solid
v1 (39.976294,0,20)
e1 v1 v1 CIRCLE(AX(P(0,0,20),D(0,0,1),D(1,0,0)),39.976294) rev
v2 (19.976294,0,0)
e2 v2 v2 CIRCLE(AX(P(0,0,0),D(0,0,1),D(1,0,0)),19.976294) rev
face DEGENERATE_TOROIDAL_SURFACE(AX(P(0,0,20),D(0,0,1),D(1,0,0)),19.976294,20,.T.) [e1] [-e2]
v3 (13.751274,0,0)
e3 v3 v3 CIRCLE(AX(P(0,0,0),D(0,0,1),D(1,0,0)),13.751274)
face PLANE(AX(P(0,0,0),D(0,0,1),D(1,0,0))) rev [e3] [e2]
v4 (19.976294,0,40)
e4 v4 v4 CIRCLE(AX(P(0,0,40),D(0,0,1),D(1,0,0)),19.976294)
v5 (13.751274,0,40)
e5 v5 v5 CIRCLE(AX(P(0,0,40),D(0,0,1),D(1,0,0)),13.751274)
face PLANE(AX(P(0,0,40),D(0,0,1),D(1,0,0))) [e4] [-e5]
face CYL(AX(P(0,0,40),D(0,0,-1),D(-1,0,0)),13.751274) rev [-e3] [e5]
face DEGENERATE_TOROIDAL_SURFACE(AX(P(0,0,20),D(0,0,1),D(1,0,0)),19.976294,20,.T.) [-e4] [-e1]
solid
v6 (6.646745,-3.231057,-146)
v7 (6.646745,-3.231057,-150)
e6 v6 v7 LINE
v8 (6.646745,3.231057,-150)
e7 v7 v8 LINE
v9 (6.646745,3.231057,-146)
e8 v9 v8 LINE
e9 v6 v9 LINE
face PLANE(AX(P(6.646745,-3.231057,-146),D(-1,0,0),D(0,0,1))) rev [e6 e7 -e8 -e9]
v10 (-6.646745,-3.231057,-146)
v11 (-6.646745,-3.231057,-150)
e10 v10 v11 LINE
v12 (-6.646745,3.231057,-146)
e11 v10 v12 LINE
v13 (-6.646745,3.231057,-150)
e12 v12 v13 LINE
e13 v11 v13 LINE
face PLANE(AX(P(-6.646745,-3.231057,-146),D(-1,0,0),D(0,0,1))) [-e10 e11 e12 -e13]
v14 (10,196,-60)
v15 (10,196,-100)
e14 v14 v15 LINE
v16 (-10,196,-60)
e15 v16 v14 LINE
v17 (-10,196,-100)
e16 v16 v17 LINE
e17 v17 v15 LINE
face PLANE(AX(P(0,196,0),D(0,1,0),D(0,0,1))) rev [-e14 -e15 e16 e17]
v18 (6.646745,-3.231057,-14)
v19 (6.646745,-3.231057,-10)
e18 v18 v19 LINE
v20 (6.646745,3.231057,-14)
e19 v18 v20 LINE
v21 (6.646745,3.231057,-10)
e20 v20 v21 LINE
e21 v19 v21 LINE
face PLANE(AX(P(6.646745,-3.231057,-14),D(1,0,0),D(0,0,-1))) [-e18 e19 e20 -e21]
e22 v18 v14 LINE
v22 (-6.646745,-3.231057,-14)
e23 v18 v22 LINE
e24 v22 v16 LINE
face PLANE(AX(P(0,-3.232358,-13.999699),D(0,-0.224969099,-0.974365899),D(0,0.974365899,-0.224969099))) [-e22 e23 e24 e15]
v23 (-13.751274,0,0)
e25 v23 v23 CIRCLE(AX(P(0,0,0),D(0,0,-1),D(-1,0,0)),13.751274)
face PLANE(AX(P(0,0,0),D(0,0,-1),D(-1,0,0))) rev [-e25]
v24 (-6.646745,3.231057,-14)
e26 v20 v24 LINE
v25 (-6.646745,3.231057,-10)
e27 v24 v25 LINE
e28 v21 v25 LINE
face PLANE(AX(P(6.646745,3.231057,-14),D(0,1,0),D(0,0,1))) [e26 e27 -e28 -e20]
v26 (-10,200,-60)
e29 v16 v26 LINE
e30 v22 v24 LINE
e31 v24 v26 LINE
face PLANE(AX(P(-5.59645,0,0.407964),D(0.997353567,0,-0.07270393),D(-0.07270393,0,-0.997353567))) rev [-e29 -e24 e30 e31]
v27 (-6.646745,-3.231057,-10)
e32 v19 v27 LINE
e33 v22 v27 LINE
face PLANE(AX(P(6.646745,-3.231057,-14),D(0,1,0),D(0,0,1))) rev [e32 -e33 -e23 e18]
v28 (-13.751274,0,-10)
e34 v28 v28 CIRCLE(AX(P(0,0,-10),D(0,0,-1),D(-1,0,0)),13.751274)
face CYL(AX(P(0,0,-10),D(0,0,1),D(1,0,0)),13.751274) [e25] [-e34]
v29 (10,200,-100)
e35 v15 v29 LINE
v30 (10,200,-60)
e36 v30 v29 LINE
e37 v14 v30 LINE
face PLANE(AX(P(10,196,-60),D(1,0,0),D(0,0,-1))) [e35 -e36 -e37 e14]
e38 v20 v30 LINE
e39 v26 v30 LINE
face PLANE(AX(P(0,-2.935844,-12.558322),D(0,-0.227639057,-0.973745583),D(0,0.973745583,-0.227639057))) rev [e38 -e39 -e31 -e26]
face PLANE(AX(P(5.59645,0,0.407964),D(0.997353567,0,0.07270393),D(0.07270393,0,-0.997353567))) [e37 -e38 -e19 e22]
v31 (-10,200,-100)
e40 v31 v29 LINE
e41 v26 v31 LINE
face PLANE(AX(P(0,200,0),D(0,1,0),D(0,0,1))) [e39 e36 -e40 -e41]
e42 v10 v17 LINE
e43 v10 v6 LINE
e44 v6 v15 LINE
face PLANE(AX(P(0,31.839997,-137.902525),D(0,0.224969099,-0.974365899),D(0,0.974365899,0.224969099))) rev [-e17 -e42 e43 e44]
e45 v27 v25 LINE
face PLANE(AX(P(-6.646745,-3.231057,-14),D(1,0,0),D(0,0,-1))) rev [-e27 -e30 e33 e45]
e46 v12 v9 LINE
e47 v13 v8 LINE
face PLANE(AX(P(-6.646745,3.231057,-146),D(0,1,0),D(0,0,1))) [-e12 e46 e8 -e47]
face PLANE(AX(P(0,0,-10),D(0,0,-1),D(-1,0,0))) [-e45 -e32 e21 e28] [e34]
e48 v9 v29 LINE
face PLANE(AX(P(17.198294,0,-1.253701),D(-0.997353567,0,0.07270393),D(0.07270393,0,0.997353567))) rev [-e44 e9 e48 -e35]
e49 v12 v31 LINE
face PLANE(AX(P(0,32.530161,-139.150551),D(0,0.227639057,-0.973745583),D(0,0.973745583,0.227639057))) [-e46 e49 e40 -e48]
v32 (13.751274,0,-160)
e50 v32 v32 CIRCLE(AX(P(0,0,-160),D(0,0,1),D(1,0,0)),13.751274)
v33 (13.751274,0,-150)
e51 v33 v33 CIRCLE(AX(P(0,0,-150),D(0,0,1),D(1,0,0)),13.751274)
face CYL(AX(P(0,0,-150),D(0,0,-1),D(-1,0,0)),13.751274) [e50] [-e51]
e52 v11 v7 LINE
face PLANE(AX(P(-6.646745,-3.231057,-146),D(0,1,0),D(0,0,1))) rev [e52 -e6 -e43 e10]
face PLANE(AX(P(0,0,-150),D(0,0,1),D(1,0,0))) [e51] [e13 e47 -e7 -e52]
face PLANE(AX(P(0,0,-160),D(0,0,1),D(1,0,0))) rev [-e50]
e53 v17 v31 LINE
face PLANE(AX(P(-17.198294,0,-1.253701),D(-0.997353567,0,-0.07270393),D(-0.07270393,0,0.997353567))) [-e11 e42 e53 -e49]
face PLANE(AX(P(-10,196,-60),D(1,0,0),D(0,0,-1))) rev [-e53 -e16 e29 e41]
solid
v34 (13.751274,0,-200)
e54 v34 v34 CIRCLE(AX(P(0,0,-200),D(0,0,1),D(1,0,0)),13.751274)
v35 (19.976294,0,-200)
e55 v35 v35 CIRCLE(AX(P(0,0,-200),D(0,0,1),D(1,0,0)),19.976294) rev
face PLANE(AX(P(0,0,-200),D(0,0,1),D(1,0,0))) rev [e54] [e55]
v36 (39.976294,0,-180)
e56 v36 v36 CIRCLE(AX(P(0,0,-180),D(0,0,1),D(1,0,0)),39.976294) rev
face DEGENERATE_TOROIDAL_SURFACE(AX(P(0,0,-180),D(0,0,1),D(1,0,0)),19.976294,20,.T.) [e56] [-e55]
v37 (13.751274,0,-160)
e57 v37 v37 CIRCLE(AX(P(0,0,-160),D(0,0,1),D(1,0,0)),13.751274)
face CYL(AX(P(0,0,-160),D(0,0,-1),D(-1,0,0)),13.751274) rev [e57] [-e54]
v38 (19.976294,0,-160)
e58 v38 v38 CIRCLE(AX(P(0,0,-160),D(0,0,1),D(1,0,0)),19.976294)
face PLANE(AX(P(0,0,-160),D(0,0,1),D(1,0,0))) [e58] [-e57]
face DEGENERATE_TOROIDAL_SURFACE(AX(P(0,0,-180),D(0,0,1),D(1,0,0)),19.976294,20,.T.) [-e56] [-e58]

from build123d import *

# Parameters (mm, degrees)
SKETCH4_R            = 19.98814713
SKETCH4_R_2          = 6.875636986
BOSS_EXTRUDE4_DEPTH  = 20
SKETCH2_R            = 19.98814713
SKETCH2_R_2          = 6.875636986
BOSS_EXTRUDE6_DEPTH  = 20
FILLET2_R            = 10
FILLET3_R            = 10
SKETCH5_R            = 6.875636986
BOSS_EXTRUDE7_DEPTH  = 5
SKETCH6_R            = 6.875636986
BOSS_EXTRUDE8_DEPTH  = 5
SKETCH7_W            = 6.646745046
SKETCH7_H            = 3.23105662
BOSS_EXTRUDE9_DEPTH  = 2
SKETCH8_W            = 6.646745046
SKETCH8_H            = 3.23105662
BOSS_EXTRUDE10_DEPTH = 2
SKETCH9_W            = 10
SKETCH9_H            = 20
BOSS_EXTRUDE11_DEPTH = 2
SCALE3_SCALE         = 2


with BuildPart() as part:
    # Sketch4 → Boss-Extrude4 (new body)
    with BuildSketch(Plane.XY.offset(-100)):
        Circle(SKETCH4_R)
        Circle(SKETCH4_R_2, mode=Mode.SUBTRACT)
    extrude(amount=BOSS_EXTRUDE4_DEPTH)

    # Fillet3
    fillet3_edges = [part.edges().sort_by_distance(p)[0] for p in [
        (-19.98814713, 0, -100),
        (-19.98814713, 0, -80),
    ]]
    fillet(fillet3_edges, radius=FILLET3_R - 0.0001)  # a hair under: the kernel refuses the full size


with BuildPart() as body_2:
    # Sketch2 → Boss-Extrude6 (new body)
    with BuildSketch(Plane.XY):
        Circle(SKETCH2_R)
        Circle(SKETCH2_R_2, mode=Mode.SUBTRACT)
    extrude(amount=BOSS_EXTRUDE6_DEPTH)

    # Fillet2
    fillet2_edges = [body_2.edges().sort_by_distance(p)[0] for p in [
        (-19.98814713, 0, 0),
        (-19.98814713, 0, 20),
    ]]
    fillet(fillet2_edges, radius=FILLET2_R - 0.0001)  # a hair under: the kernel refuses the full size


with BuildPart() as body_3:
    # Sketch5 → Boss-Extrude7 (new body)
    with BuildSketch(Plane.XY.offset(-80)):
        Circle(SKETCH5_R)
    extrude(amount=BOSS_EXTRUDE7_DEPTH)

    # Sketch8 → Boss-Extrude10 (add)
    with BuildSketch(Plane.XY.offset(-75)):
        Rectangle(SKETCH8_W, SKETCH8_H)
    extrude(amount=BOSS_EXTRUDE10_DEPTH)



with BuildPart() as body_4:
    # Sketch6 → Boss-Extrude8 (new body)
    with BuildSketch(Plane(origin=(0, 0, 0), x_dir=(-1, 0, 0), z_dir=(0, 0, -1))):
        with Locations(Location((0, 0, 0), (0, 0, 180))):
            Circle(SKETCH6_R)
    extrude(amount=BOSS_EXTRUDE8_DEPTH)

    # Sketch7 → Boss-Extrude9 (add)
    with BuildSketch(Plane(origin=(0, 0, -5), x_dir=(-1, 0, 0), z_dir=(0, 0, -1))):
        Rectangle(SKETCH7_W, SKETCH7_H)
    extrude(amount=BOSS_EXTRUDE9_DEPTH)



with BuildPart() as body_5:
    # Sketch9 → Boss-Extrude11 (new body)
    with BuildSketch(Plane(origin=(0, 100, 0), x_dir=(1, 0, 0), z_dir=(0, 1, 0))):
        with Locations((0, 40)):
            Rectangle(SKETCH9_W, SKETCH9_H)
    extrude(amount=-BOSS_EXTRUDE11_DEPTH)


with BuildPart() as body_3_1:
    add(body_3.part)

    add(body_5.part)  # loft1 joins it to this body
    # loft from a face of the part (loft1)
    loft([body_3_1.faces().sort_by_distance((0, 0, -73))[0], body_3_1.faces().sort_by_distance((0, 99, -50))[0]])


with BuildPart() as body_4_1:
    add(body_4.part)

    add(body_3_1.part)  # loft3 joins it to this body
    # loft from a face of the part (loft3)
    loft([body_4_1.faces().sort_by_distance((0, 0, -7))[0], body_4_1.faces().sort_by_distance((0, 99, -30))[0]])


with BuildPart() as body_2_1:
    # Scale3: scaled about (0, 0, 0)
    add(body_2.part.scale(SCALE3_SCALE))


with BuildPart() as body_4_2:
    # Scale3: scaled about (0, 0, 0)
    add(body_4_1.part.scale(SCALE3_SCALE))


with BuildPart() as part_1:
    # Scale3: scaled about (0, 0, 0)
    add(part.part.scale(SCALE3_SCALE))


solid = Compound([body_2_1.part, body_4_2.part, part_1.part])
